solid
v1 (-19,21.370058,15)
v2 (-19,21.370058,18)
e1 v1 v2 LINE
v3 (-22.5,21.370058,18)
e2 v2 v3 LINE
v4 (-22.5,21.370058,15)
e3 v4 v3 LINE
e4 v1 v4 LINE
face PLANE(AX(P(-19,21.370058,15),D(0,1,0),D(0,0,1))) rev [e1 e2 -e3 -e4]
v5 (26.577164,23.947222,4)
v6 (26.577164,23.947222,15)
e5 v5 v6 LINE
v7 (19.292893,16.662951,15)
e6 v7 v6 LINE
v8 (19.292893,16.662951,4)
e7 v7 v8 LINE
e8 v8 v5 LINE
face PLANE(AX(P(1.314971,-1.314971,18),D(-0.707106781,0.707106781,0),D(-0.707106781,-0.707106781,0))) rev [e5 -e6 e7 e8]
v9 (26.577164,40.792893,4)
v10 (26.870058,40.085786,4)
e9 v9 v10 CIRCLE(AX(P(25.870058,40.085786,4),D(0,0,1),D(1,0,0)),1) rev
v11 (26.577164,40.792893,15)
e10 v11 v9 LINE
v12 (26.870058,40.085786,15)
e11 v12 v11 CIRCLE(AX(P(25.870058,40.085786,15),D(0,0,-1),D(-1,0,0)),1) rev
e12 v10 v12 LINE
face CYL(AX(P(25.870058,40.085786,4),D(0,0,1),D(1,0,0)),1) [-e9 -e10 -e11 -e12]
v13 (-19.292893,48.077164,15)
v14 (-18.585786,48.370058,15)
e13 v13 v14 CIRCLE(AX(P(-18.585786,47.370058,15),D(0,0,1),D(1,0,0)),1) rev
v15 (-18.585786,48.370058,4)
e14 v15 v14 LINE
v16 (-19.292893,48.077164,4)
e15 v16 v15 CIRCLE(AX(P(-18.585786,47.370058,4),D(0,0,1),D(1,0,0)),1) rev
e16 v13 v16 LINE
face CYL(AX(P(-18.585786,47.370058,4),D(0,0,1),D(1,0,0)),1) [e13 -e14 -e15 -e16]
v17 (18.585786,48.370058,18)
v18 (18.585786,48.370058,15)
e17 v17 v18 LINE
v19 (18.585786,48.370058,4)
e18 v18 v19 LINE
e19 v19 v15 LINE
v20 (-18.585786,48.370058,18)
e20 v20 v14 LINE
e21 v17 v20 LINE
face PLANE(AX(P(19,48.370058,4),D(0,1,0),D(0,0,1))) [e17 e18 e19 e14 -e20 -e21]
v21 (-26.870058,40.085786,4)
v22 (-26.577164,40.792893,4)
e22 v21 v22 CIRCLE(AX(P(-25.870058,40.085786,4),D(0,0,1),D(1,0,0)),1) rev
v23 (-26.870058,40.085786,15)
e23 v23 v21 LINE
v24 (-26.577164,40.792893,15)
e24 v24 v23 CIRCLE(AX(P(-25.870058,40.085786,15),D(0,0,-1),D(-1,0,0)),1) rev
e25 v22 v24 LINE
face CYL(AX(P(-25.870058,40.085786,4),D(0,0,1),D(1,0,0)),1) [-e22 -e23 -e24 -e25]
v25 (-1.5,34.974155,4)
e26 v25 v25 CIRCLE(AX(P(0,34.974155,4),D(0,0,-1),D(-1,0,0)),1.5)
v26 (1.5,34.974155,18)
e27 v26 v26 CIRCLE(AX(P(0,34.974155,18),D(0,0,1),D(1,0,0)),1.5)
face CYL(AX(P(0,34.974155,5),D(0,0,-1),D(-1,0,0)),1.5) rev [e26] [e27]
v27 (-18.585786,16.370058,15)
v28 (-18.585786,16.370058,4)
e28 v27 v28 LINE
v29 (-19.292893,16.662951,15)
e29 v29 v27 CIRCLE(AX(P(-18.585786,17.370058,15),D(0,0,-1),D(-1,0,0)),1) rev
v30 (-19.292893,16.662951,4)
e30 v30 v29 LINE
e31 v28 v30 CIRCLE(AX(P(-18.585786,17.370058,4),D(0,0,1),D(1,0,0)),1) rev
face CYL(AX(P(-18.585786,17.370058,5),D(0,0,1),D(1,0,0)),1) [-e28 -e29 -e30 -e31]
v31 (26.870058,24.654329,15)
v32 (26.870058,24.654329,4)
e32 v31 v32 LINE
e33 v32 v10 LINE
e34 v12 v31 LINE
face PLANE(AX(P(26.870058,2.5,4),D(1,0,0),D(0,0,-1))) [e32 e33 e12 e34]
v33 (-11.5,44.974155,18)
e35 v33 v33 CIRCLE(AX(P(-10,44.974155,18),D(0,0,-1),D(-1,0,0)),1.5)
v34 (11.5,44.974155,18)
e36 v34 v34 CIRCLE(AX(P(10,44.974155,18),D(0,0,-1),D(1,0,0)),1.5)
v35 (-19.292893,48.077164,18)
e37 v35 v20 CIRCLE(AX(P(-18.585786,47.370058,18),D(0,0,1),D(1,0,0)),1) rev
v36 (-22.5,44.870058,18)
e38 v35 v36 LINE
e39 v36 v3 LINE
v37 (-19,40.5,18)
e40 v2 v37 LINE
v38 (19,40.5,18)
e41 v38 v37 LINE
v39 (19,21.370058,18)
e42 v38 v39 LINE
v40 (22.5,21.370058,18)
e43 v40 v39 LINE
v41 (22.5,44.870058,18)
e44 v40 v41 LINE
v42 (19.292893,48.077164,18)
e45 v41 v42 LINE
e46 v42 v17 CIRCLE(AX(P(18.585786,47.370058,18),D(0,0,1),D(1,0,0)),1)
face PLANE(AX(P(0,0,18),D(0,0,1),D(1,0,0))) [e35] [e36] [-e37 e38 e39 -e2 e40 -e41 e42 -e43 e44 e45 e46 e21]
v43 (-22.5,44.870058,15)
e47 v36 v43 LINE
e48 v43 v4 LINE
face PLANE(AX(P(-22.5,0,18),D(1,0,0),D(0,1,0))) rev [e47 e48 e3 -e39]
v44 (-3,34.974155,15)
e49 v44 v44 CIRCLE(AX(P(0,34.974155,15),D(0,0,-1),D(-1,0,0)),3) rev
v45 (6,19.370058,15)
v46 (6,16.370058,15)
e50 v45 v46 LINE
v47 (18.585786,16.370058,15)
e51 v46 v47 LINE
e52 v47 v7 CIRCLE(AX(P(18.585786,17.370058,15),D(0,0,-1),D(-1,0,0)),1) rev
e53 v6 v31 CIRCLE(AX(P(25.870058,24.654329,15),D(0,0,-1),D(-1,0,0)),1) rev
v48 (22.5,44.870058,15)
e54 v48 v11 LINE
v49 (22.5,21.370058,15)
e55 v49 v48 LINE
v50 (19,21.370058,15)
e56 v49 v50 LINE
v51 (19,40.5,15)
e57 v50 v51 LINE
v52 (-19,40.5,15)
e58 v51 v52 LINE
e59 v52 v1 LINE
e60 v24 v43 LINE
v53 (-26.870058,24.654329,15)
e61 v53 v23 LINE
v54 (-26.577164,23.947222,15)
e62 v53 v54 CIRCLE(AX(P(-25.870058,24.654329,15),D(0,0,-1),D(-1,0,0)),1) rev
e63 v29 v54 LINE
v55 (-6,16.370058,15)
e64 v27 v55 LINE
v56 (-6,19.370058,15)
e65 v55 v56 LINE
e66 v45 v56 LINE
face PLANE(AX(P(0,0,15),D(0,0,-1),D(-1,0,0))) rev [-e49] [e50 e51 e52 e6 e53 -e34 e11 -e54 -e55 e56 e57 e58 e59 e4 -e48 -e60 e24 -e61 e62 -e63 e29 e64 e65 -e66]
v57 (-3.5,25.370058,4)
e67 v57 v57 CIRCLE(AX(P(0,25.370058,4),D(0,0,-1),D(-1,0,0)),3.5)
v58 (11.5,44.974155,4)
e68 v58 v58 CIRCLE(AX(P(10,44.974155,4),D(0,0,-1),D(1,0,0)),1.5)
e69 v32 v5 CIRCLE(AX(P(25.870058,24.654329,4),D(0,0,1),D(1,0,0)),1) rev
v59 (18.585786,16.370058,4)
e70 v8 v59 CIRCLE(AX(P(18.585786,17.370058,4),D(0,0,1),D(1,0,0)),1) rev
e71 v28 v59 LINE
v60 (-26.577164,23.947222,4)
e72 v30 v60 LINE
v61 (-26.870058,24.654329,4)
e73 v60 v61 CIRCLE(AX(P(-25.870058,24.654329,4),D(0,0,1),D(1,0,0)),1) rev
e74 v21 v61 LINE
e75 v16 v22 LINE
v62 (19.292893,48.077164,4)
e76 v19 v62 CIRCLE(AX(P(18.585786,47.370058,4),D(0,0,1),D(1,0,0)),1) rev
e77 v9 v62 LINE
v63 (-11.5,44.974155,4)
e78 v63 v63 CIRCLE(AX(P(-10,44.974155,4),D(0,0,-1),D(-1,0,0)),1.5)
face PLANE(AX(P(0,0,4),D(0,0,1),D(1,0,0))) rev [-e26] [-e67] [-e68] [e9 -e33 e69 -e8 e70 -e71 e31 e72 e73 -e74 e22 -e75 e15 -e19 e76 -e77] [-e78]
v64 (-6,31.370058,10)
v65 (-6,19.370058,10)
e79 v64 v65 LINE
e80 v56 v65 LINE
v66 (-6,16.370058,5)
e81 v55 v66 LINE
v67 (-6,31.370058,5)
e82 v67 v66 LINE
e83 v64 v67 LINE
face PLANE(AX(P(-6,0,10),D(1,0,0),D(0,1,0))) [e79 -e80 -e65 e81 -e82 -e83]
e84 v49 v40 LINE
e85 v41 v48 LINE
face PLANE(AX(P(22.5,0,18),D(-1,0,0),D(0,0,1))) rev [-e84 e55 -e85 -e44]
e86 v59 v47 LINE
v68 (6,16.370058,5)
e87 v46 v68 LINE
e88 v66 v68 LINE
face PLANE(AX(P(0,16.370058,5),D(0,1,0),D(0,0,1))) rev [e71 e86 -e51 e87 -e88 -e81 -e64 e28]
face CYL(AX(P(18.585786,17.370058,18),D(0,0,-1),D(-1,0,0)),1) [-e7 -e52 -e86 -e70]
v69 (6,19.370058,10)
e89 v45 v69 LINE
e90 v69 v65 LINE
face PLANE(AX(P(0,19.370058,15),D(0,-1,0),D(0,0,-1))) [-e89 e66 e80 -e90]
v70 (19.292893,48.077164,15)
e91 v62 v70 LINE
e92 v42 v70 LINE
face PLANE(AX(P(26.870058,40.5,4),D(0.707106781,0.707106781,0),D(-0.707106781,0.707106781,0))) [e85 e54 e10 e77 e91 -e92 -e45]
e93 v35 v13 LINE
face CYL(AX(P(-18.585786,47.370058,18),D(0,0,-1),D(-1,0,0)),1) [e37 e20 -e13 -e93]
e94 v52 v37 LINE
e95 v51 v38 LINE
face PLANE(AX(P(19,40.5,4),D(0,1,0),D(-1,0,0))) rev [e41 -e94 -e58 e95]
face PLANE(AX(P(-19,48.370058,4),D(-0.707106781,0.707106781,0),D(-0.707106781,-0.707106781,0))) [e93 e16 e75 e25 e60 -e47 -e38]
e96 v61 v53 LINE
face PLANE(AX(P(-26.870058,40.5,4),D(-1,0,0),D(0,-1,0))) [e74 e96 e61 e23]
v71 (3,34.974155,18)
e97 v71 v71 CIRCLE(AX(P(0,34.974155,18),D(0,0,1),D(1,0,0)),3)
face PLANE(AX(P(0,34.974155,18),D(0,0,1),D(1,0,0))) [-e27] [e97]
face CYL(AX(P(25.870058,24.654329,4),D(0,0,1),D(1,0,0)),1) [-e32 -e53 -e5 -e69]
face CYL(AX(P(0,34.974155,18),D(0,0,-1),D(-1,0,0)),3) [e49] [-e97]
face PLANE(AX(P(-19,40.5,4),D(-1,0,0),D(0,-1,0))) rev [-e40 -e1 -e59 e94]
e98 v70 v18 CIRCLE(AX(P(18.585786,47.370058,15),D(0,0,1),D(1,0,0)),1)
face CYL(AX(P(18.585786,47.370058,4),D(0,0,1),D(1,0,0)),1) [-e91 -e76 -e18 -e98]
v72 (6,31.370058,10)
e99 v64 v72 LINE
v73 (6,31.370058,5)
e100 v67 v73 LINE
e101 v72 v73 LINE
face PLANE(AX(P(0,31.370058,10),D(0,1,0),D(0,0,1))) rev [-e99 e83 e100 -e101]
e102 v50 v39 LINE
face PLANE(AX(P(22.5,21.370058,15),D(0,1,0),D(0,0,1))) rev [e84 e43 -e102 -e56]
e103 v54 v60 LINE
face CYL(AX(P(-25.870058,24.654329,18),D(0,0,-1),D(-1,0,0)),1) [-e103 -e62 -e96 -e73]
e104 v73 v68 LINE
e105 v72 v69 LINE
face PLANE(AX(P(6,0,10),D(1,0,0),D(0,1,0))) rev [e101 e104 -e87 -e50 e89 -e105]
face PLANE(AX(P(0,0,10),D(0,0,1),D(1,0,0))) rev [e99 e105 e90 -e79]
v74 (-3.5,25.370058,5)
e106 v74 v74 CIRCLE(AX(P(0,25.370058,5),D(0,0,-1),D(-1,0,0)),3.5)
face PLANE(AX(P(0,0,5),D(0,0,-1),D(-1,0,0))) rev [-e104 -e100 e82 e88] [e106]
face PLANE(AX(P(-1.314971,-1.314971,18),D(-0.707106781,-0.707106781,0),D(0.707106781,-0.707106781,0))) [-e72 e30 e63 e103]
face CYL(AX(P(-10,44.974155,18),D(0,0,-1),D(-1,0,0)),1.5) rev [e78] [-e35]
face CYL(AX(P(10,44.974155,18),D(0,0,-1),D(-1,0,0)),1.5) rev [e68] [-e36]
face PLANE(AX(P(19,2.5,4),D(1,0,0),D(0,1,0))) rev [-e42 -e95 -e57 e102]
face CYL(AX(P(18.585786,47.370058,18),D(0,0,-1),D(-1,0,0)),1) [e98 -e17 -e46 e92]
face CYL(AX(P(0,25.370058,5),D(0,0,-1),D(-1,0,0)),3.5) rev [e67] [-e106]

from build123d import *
from build123d.topology import SkipClean

# Parameters (mm, degrees)
CROQUIS3_W                   = 38
CROQUIS3_H                   = 38
SALIENTE_EXTRUIR9_DEPTH      = 1
SALIENTE_EXTRUIR10_START     = -11
SALIENTE_EXTRUIR10_OUTLINE_W = 38
SALIENTE_EXTRUIR10_OUTLINE_H = 38
SALIENTE_EXTRUIR10_DEPTH     = 10
CROQUIS13_W                  = 38
CROQUIS13_H                  = 38
SALIENTE_EXTRUIR15_DEPTH     = 3
CROQUIS14_R                  = 1.5
CORTAR_EXTRUIR1_DEPTH        = 14
CROQUIS15_W                  = 38
CROQUIS15_H                  = 24.129942315
CROQUIS15_R                  = 1.5
CROQUIS15_R_2                = 3.5
SALIENTE_EXTRUIR16_DEPTH     = 1
CORTAR_EXTRUIR2_DEPTH        = 14
CROQUIS17_R                  = 1.5
SALIENTE_EXTRUIR17_DEPTH     = 5
CROQUIS18_R                  = 1.5
CROQUIS18_W                  = 12
CROQUIS18_H                  = 12
SALIENTE_EXTRUIR18_DEPTH     = 5
CORTAR_EXTRUIR3_DEPTH        = 3
CROQUIS20_R                  = 3
CROQUIS20_R_2                = 1.5
SALIENTE_EXTRUIR19_DEPTH     = 3
REDONDEO11_R                 = 1


# Read off the part's stored shape, not the designer's step: Saliente-Extruir10
with BuildPart() as part:
    # Croquis3 → Saliente-Extruir9 (new body)
    with BuildSketch(Plane.XY.offset(5)):
        Polygon((19, -5.370057685), (26.870057685, 2.5), (26.870057685, 40.5), (19, 48.370057685), (-19, 48.370057685), (-26.870057685, 40.5), (-26.870057685, 2.5), (-19, -5.370057685), align=None)
        with Locations((0, 21.5)):
            Rectangle(CROQUIS3_W, CROQUIS3_H, mode=Mode.SUBTRACT)
    extrude(amount=-SALIENTE_EXTRUIR9_DEPTH)

    # Saliente-Extruir10 outline → Saliente-Extruir10 (add)
    with BuildSketch(Plane(origin=(0, 0, 4), x_dir=(-1, 0, 0), z_dir=(0, 0, -1)).offset(SALIENTE_EXTRUIR10_START)):
        Polygon((-26.870057685, 2.5), (-19, -5.370057685), (19, -5.370057685), (26.870057685, 2.5), (26.870057685, 40.5), (19, 48.370057685), (-19, 48.370057685), (-26.870057685, 40.5), align=None)
        with Locations((0, 21.5)):
            Rectangle(SALIENTE_EXTRUIR10_OUTLINE_W, SALIENTE_EXTRUIR10_OUTLINE_H, mode=Mode.SUBTRACT)
    extrude(amount=SALIENTE_EXTRUIR10_DEPTH)

    # Croquis13 → Saliente-Extruir15 (add)
    with BuildSketch(Plane.XY.offset(15)):
        with BuildLine():
            Line((-22.5, 44.870057685), (-22.5, -1))
            Line((-22.5, -1), (22.5, -1))
            Line((22.5, -1), (22.5, 44.870057685))
            Line((22.5, 44.870057685), (19.292893219, 48.077164466))
            ThreePointArc((19.292893219, 48.077164466), (18.96846987, 48.293937218), (18.585786438, 48.370057685))
            Line((18.585786438, 48.370057685), (-18.585786438, 48.370057685))
            ThreePointArc((-18.585786438, 48.370057685), (-18.96846987, 48.293937218), (-19.292893219, 48.077164466))
            Line((-19.292893219, 48.077164466), (-22.5, 44.870057685))
        make_face()
        with Locations((0, 21.5)):
            Rectangle(CROQUIS13_W, CROQUIS13_H, mode=Mode.SUBTRACT)
    extrude(amount=SALIENTE_EXTRUIR15_DEPTH)

    # Croquis14 → Cortar-Extruir1 (cut)
    with BuildSketch(Plane(origin=(0, 0, 4), x_dir=(-1, 0, 0), z_dir=(0, 0, -1))):
        with Locations((10, 44.97415474)):
            Circle(CROQUIS14_R)
        with Locations(Location((-10, 44.97415474, 0), (0, 0, 180))):
            Circle(CROQUIS14_R)
    extrude(amount=-CORTAR_EXTRUIR1_DEPTH, mode=Mode.SUBTRACT)

    # Croquis15 → Saliente-Extruir16 (add)
    with BuildSketch(Plane(origin=(0, 0, 4), x_dir=(-1, 0, 0), z_dir=(0, 0, -1))):
        with Locations((0, 28.435028843)):
            Rectangle(CROQUIS15_W, CROQUIS15_H)
        with Locations((0, 34.97415474)):
            Circle(CROQUIS15_R, mode=Mode.SUBTRACT)
        with Locations((0, 25.370057685)):
            Circle(CROQUIS15_R_2, mode=Mode.SUBTRACT)
    extrude(amount=-SALIENTE_EXTRUIR16_DEPTH)

    # Croquis16 → Cortar-Extruir2 (cut)
    with BuildSketch(Plane(origin=(0, 0, 4), x_dir=(-1, 0, 0), z_dir=(0, 0, -1))):
        Polygon((-19, 2.5), (-19, 16.370057685), (-26.870057685, 24.24011537), (-26.870057685, 2.5), (-19, -5.370057685), (19, -5.370057685), (26.870057685, 2.5), (26.870057685, 24.24011537), (19, 16.370057685), (19, 2.5), align=None)
    extrude(amount=-CORTAR_EXTRUIR2_DEPTH, mode=Mode.SUBTRACT)

    # Croquis17 → Saliente-Extruir17 (add)
    with SkipClean():  # the faces are left unmerged after this step: merging them gives an invalid solid
        with BuildSketch(Plane.XY.offset(5)):
            Polygon((6, 31.370057685), (6, 25.370057685), (6, 19.370057685), (6, 16.370057685), (19, 16.370057685), (19, 40.5), (-19, 40.5), (-19, 16.370057685), (-6, 16.370057685), (-6, 19.370057685), (-6, 31.370057685), align=None)
            with Locations((0, 34.97415474)):
                Circle(CROQUIS17_R, mode=Mode.SUBTRACT)
        extrude(amount=SALIENTE_EXTRUIR17_DEPTH)
    add(part.part.scale(1), mode=Mode.REPLACE)  # the faces are merged on a copy

    # Croquis18 → Saliente-Extruir18 (add)
    # profile 1 of 2: a face of its own
    with BuildSketch(Plane.XY.offset(10)):
        Polygon((-6, 31.370057685), (6, 31.370057685), (6, 16.370057685), (19, 16.370057685), (19, 40.5), (-19, 40.5), (-19, 16.370057685), (-6, 16.370057685), align=None)
        with Locations(Location((0, 34.97415474, 0), (0, 0, 180))):
            Circle(CROQUIS18_R, mode=Mode.SUBTRACT)
    # profile 2 of 2: a face of its own
    with BuildSketch(Plane.XY.offset(10)):
        with Locations((0, 25.370057685)):
            Rectangle(CROQUIS18_W, CROQUIS18_H)
    extrude(amount=SALIENTE_EXTRUIR18_DEPTH)

    # Croquis19 → Cortar-Extruir3 (cut)
    with BuildSketch(Plane.XY.offset(18)):
        Polygon((-22.5, 19.870057685), (-19, 16.370057685), (-19, 21.370057685), (-22.5, 21.370057685), align=None)
        Polygon((19, 16.370057685), (22.5, 19.870057685), (22.5, 21.370057685), (19, 21.370057685), align=None)
    extrude(amount=-CORTAR_EXTRUIR3_DEPTH, mode=Mode.SUBTRACT)

    # Croquis20 → Saliente-Extruir19 (add)
    with BuildSketch(Plane.XY.offset(15)):
        with Locations(Location((0, 34.97415474, 0), (0, 0, 180))):
            Circle(CROQUIS20_R)
        with Locations(Location((0, 34.97415474, 0), (0, 0, 180))):
            Circle(CROQUIS20_R_2, mode=Mode.SUBTRACT)
    extrude(amount=SALIENTE_EXTRUIR19_DEPTH)

    # Redondeo11
    redondeo11_edges = [part.edges().sort_by_distance(p)[0] for p in [
        (26.870057685, 40.5, 10),
        (19, 48.370057685, 10),
        (-19, 48.370057685, 10),
        (-26.870057685, 40.5, 10),
        (26.870057685, 24.24011537, 9.5),
        (19, 16.370057685, 9.5),
        (-26.870057685, 24.24011537, 9.5),
        (-19, 16.370057685, 9.5),
    ]]
    fillet(redondeo11_edges, radius=REDONDEO11_R)


solid = part.part
